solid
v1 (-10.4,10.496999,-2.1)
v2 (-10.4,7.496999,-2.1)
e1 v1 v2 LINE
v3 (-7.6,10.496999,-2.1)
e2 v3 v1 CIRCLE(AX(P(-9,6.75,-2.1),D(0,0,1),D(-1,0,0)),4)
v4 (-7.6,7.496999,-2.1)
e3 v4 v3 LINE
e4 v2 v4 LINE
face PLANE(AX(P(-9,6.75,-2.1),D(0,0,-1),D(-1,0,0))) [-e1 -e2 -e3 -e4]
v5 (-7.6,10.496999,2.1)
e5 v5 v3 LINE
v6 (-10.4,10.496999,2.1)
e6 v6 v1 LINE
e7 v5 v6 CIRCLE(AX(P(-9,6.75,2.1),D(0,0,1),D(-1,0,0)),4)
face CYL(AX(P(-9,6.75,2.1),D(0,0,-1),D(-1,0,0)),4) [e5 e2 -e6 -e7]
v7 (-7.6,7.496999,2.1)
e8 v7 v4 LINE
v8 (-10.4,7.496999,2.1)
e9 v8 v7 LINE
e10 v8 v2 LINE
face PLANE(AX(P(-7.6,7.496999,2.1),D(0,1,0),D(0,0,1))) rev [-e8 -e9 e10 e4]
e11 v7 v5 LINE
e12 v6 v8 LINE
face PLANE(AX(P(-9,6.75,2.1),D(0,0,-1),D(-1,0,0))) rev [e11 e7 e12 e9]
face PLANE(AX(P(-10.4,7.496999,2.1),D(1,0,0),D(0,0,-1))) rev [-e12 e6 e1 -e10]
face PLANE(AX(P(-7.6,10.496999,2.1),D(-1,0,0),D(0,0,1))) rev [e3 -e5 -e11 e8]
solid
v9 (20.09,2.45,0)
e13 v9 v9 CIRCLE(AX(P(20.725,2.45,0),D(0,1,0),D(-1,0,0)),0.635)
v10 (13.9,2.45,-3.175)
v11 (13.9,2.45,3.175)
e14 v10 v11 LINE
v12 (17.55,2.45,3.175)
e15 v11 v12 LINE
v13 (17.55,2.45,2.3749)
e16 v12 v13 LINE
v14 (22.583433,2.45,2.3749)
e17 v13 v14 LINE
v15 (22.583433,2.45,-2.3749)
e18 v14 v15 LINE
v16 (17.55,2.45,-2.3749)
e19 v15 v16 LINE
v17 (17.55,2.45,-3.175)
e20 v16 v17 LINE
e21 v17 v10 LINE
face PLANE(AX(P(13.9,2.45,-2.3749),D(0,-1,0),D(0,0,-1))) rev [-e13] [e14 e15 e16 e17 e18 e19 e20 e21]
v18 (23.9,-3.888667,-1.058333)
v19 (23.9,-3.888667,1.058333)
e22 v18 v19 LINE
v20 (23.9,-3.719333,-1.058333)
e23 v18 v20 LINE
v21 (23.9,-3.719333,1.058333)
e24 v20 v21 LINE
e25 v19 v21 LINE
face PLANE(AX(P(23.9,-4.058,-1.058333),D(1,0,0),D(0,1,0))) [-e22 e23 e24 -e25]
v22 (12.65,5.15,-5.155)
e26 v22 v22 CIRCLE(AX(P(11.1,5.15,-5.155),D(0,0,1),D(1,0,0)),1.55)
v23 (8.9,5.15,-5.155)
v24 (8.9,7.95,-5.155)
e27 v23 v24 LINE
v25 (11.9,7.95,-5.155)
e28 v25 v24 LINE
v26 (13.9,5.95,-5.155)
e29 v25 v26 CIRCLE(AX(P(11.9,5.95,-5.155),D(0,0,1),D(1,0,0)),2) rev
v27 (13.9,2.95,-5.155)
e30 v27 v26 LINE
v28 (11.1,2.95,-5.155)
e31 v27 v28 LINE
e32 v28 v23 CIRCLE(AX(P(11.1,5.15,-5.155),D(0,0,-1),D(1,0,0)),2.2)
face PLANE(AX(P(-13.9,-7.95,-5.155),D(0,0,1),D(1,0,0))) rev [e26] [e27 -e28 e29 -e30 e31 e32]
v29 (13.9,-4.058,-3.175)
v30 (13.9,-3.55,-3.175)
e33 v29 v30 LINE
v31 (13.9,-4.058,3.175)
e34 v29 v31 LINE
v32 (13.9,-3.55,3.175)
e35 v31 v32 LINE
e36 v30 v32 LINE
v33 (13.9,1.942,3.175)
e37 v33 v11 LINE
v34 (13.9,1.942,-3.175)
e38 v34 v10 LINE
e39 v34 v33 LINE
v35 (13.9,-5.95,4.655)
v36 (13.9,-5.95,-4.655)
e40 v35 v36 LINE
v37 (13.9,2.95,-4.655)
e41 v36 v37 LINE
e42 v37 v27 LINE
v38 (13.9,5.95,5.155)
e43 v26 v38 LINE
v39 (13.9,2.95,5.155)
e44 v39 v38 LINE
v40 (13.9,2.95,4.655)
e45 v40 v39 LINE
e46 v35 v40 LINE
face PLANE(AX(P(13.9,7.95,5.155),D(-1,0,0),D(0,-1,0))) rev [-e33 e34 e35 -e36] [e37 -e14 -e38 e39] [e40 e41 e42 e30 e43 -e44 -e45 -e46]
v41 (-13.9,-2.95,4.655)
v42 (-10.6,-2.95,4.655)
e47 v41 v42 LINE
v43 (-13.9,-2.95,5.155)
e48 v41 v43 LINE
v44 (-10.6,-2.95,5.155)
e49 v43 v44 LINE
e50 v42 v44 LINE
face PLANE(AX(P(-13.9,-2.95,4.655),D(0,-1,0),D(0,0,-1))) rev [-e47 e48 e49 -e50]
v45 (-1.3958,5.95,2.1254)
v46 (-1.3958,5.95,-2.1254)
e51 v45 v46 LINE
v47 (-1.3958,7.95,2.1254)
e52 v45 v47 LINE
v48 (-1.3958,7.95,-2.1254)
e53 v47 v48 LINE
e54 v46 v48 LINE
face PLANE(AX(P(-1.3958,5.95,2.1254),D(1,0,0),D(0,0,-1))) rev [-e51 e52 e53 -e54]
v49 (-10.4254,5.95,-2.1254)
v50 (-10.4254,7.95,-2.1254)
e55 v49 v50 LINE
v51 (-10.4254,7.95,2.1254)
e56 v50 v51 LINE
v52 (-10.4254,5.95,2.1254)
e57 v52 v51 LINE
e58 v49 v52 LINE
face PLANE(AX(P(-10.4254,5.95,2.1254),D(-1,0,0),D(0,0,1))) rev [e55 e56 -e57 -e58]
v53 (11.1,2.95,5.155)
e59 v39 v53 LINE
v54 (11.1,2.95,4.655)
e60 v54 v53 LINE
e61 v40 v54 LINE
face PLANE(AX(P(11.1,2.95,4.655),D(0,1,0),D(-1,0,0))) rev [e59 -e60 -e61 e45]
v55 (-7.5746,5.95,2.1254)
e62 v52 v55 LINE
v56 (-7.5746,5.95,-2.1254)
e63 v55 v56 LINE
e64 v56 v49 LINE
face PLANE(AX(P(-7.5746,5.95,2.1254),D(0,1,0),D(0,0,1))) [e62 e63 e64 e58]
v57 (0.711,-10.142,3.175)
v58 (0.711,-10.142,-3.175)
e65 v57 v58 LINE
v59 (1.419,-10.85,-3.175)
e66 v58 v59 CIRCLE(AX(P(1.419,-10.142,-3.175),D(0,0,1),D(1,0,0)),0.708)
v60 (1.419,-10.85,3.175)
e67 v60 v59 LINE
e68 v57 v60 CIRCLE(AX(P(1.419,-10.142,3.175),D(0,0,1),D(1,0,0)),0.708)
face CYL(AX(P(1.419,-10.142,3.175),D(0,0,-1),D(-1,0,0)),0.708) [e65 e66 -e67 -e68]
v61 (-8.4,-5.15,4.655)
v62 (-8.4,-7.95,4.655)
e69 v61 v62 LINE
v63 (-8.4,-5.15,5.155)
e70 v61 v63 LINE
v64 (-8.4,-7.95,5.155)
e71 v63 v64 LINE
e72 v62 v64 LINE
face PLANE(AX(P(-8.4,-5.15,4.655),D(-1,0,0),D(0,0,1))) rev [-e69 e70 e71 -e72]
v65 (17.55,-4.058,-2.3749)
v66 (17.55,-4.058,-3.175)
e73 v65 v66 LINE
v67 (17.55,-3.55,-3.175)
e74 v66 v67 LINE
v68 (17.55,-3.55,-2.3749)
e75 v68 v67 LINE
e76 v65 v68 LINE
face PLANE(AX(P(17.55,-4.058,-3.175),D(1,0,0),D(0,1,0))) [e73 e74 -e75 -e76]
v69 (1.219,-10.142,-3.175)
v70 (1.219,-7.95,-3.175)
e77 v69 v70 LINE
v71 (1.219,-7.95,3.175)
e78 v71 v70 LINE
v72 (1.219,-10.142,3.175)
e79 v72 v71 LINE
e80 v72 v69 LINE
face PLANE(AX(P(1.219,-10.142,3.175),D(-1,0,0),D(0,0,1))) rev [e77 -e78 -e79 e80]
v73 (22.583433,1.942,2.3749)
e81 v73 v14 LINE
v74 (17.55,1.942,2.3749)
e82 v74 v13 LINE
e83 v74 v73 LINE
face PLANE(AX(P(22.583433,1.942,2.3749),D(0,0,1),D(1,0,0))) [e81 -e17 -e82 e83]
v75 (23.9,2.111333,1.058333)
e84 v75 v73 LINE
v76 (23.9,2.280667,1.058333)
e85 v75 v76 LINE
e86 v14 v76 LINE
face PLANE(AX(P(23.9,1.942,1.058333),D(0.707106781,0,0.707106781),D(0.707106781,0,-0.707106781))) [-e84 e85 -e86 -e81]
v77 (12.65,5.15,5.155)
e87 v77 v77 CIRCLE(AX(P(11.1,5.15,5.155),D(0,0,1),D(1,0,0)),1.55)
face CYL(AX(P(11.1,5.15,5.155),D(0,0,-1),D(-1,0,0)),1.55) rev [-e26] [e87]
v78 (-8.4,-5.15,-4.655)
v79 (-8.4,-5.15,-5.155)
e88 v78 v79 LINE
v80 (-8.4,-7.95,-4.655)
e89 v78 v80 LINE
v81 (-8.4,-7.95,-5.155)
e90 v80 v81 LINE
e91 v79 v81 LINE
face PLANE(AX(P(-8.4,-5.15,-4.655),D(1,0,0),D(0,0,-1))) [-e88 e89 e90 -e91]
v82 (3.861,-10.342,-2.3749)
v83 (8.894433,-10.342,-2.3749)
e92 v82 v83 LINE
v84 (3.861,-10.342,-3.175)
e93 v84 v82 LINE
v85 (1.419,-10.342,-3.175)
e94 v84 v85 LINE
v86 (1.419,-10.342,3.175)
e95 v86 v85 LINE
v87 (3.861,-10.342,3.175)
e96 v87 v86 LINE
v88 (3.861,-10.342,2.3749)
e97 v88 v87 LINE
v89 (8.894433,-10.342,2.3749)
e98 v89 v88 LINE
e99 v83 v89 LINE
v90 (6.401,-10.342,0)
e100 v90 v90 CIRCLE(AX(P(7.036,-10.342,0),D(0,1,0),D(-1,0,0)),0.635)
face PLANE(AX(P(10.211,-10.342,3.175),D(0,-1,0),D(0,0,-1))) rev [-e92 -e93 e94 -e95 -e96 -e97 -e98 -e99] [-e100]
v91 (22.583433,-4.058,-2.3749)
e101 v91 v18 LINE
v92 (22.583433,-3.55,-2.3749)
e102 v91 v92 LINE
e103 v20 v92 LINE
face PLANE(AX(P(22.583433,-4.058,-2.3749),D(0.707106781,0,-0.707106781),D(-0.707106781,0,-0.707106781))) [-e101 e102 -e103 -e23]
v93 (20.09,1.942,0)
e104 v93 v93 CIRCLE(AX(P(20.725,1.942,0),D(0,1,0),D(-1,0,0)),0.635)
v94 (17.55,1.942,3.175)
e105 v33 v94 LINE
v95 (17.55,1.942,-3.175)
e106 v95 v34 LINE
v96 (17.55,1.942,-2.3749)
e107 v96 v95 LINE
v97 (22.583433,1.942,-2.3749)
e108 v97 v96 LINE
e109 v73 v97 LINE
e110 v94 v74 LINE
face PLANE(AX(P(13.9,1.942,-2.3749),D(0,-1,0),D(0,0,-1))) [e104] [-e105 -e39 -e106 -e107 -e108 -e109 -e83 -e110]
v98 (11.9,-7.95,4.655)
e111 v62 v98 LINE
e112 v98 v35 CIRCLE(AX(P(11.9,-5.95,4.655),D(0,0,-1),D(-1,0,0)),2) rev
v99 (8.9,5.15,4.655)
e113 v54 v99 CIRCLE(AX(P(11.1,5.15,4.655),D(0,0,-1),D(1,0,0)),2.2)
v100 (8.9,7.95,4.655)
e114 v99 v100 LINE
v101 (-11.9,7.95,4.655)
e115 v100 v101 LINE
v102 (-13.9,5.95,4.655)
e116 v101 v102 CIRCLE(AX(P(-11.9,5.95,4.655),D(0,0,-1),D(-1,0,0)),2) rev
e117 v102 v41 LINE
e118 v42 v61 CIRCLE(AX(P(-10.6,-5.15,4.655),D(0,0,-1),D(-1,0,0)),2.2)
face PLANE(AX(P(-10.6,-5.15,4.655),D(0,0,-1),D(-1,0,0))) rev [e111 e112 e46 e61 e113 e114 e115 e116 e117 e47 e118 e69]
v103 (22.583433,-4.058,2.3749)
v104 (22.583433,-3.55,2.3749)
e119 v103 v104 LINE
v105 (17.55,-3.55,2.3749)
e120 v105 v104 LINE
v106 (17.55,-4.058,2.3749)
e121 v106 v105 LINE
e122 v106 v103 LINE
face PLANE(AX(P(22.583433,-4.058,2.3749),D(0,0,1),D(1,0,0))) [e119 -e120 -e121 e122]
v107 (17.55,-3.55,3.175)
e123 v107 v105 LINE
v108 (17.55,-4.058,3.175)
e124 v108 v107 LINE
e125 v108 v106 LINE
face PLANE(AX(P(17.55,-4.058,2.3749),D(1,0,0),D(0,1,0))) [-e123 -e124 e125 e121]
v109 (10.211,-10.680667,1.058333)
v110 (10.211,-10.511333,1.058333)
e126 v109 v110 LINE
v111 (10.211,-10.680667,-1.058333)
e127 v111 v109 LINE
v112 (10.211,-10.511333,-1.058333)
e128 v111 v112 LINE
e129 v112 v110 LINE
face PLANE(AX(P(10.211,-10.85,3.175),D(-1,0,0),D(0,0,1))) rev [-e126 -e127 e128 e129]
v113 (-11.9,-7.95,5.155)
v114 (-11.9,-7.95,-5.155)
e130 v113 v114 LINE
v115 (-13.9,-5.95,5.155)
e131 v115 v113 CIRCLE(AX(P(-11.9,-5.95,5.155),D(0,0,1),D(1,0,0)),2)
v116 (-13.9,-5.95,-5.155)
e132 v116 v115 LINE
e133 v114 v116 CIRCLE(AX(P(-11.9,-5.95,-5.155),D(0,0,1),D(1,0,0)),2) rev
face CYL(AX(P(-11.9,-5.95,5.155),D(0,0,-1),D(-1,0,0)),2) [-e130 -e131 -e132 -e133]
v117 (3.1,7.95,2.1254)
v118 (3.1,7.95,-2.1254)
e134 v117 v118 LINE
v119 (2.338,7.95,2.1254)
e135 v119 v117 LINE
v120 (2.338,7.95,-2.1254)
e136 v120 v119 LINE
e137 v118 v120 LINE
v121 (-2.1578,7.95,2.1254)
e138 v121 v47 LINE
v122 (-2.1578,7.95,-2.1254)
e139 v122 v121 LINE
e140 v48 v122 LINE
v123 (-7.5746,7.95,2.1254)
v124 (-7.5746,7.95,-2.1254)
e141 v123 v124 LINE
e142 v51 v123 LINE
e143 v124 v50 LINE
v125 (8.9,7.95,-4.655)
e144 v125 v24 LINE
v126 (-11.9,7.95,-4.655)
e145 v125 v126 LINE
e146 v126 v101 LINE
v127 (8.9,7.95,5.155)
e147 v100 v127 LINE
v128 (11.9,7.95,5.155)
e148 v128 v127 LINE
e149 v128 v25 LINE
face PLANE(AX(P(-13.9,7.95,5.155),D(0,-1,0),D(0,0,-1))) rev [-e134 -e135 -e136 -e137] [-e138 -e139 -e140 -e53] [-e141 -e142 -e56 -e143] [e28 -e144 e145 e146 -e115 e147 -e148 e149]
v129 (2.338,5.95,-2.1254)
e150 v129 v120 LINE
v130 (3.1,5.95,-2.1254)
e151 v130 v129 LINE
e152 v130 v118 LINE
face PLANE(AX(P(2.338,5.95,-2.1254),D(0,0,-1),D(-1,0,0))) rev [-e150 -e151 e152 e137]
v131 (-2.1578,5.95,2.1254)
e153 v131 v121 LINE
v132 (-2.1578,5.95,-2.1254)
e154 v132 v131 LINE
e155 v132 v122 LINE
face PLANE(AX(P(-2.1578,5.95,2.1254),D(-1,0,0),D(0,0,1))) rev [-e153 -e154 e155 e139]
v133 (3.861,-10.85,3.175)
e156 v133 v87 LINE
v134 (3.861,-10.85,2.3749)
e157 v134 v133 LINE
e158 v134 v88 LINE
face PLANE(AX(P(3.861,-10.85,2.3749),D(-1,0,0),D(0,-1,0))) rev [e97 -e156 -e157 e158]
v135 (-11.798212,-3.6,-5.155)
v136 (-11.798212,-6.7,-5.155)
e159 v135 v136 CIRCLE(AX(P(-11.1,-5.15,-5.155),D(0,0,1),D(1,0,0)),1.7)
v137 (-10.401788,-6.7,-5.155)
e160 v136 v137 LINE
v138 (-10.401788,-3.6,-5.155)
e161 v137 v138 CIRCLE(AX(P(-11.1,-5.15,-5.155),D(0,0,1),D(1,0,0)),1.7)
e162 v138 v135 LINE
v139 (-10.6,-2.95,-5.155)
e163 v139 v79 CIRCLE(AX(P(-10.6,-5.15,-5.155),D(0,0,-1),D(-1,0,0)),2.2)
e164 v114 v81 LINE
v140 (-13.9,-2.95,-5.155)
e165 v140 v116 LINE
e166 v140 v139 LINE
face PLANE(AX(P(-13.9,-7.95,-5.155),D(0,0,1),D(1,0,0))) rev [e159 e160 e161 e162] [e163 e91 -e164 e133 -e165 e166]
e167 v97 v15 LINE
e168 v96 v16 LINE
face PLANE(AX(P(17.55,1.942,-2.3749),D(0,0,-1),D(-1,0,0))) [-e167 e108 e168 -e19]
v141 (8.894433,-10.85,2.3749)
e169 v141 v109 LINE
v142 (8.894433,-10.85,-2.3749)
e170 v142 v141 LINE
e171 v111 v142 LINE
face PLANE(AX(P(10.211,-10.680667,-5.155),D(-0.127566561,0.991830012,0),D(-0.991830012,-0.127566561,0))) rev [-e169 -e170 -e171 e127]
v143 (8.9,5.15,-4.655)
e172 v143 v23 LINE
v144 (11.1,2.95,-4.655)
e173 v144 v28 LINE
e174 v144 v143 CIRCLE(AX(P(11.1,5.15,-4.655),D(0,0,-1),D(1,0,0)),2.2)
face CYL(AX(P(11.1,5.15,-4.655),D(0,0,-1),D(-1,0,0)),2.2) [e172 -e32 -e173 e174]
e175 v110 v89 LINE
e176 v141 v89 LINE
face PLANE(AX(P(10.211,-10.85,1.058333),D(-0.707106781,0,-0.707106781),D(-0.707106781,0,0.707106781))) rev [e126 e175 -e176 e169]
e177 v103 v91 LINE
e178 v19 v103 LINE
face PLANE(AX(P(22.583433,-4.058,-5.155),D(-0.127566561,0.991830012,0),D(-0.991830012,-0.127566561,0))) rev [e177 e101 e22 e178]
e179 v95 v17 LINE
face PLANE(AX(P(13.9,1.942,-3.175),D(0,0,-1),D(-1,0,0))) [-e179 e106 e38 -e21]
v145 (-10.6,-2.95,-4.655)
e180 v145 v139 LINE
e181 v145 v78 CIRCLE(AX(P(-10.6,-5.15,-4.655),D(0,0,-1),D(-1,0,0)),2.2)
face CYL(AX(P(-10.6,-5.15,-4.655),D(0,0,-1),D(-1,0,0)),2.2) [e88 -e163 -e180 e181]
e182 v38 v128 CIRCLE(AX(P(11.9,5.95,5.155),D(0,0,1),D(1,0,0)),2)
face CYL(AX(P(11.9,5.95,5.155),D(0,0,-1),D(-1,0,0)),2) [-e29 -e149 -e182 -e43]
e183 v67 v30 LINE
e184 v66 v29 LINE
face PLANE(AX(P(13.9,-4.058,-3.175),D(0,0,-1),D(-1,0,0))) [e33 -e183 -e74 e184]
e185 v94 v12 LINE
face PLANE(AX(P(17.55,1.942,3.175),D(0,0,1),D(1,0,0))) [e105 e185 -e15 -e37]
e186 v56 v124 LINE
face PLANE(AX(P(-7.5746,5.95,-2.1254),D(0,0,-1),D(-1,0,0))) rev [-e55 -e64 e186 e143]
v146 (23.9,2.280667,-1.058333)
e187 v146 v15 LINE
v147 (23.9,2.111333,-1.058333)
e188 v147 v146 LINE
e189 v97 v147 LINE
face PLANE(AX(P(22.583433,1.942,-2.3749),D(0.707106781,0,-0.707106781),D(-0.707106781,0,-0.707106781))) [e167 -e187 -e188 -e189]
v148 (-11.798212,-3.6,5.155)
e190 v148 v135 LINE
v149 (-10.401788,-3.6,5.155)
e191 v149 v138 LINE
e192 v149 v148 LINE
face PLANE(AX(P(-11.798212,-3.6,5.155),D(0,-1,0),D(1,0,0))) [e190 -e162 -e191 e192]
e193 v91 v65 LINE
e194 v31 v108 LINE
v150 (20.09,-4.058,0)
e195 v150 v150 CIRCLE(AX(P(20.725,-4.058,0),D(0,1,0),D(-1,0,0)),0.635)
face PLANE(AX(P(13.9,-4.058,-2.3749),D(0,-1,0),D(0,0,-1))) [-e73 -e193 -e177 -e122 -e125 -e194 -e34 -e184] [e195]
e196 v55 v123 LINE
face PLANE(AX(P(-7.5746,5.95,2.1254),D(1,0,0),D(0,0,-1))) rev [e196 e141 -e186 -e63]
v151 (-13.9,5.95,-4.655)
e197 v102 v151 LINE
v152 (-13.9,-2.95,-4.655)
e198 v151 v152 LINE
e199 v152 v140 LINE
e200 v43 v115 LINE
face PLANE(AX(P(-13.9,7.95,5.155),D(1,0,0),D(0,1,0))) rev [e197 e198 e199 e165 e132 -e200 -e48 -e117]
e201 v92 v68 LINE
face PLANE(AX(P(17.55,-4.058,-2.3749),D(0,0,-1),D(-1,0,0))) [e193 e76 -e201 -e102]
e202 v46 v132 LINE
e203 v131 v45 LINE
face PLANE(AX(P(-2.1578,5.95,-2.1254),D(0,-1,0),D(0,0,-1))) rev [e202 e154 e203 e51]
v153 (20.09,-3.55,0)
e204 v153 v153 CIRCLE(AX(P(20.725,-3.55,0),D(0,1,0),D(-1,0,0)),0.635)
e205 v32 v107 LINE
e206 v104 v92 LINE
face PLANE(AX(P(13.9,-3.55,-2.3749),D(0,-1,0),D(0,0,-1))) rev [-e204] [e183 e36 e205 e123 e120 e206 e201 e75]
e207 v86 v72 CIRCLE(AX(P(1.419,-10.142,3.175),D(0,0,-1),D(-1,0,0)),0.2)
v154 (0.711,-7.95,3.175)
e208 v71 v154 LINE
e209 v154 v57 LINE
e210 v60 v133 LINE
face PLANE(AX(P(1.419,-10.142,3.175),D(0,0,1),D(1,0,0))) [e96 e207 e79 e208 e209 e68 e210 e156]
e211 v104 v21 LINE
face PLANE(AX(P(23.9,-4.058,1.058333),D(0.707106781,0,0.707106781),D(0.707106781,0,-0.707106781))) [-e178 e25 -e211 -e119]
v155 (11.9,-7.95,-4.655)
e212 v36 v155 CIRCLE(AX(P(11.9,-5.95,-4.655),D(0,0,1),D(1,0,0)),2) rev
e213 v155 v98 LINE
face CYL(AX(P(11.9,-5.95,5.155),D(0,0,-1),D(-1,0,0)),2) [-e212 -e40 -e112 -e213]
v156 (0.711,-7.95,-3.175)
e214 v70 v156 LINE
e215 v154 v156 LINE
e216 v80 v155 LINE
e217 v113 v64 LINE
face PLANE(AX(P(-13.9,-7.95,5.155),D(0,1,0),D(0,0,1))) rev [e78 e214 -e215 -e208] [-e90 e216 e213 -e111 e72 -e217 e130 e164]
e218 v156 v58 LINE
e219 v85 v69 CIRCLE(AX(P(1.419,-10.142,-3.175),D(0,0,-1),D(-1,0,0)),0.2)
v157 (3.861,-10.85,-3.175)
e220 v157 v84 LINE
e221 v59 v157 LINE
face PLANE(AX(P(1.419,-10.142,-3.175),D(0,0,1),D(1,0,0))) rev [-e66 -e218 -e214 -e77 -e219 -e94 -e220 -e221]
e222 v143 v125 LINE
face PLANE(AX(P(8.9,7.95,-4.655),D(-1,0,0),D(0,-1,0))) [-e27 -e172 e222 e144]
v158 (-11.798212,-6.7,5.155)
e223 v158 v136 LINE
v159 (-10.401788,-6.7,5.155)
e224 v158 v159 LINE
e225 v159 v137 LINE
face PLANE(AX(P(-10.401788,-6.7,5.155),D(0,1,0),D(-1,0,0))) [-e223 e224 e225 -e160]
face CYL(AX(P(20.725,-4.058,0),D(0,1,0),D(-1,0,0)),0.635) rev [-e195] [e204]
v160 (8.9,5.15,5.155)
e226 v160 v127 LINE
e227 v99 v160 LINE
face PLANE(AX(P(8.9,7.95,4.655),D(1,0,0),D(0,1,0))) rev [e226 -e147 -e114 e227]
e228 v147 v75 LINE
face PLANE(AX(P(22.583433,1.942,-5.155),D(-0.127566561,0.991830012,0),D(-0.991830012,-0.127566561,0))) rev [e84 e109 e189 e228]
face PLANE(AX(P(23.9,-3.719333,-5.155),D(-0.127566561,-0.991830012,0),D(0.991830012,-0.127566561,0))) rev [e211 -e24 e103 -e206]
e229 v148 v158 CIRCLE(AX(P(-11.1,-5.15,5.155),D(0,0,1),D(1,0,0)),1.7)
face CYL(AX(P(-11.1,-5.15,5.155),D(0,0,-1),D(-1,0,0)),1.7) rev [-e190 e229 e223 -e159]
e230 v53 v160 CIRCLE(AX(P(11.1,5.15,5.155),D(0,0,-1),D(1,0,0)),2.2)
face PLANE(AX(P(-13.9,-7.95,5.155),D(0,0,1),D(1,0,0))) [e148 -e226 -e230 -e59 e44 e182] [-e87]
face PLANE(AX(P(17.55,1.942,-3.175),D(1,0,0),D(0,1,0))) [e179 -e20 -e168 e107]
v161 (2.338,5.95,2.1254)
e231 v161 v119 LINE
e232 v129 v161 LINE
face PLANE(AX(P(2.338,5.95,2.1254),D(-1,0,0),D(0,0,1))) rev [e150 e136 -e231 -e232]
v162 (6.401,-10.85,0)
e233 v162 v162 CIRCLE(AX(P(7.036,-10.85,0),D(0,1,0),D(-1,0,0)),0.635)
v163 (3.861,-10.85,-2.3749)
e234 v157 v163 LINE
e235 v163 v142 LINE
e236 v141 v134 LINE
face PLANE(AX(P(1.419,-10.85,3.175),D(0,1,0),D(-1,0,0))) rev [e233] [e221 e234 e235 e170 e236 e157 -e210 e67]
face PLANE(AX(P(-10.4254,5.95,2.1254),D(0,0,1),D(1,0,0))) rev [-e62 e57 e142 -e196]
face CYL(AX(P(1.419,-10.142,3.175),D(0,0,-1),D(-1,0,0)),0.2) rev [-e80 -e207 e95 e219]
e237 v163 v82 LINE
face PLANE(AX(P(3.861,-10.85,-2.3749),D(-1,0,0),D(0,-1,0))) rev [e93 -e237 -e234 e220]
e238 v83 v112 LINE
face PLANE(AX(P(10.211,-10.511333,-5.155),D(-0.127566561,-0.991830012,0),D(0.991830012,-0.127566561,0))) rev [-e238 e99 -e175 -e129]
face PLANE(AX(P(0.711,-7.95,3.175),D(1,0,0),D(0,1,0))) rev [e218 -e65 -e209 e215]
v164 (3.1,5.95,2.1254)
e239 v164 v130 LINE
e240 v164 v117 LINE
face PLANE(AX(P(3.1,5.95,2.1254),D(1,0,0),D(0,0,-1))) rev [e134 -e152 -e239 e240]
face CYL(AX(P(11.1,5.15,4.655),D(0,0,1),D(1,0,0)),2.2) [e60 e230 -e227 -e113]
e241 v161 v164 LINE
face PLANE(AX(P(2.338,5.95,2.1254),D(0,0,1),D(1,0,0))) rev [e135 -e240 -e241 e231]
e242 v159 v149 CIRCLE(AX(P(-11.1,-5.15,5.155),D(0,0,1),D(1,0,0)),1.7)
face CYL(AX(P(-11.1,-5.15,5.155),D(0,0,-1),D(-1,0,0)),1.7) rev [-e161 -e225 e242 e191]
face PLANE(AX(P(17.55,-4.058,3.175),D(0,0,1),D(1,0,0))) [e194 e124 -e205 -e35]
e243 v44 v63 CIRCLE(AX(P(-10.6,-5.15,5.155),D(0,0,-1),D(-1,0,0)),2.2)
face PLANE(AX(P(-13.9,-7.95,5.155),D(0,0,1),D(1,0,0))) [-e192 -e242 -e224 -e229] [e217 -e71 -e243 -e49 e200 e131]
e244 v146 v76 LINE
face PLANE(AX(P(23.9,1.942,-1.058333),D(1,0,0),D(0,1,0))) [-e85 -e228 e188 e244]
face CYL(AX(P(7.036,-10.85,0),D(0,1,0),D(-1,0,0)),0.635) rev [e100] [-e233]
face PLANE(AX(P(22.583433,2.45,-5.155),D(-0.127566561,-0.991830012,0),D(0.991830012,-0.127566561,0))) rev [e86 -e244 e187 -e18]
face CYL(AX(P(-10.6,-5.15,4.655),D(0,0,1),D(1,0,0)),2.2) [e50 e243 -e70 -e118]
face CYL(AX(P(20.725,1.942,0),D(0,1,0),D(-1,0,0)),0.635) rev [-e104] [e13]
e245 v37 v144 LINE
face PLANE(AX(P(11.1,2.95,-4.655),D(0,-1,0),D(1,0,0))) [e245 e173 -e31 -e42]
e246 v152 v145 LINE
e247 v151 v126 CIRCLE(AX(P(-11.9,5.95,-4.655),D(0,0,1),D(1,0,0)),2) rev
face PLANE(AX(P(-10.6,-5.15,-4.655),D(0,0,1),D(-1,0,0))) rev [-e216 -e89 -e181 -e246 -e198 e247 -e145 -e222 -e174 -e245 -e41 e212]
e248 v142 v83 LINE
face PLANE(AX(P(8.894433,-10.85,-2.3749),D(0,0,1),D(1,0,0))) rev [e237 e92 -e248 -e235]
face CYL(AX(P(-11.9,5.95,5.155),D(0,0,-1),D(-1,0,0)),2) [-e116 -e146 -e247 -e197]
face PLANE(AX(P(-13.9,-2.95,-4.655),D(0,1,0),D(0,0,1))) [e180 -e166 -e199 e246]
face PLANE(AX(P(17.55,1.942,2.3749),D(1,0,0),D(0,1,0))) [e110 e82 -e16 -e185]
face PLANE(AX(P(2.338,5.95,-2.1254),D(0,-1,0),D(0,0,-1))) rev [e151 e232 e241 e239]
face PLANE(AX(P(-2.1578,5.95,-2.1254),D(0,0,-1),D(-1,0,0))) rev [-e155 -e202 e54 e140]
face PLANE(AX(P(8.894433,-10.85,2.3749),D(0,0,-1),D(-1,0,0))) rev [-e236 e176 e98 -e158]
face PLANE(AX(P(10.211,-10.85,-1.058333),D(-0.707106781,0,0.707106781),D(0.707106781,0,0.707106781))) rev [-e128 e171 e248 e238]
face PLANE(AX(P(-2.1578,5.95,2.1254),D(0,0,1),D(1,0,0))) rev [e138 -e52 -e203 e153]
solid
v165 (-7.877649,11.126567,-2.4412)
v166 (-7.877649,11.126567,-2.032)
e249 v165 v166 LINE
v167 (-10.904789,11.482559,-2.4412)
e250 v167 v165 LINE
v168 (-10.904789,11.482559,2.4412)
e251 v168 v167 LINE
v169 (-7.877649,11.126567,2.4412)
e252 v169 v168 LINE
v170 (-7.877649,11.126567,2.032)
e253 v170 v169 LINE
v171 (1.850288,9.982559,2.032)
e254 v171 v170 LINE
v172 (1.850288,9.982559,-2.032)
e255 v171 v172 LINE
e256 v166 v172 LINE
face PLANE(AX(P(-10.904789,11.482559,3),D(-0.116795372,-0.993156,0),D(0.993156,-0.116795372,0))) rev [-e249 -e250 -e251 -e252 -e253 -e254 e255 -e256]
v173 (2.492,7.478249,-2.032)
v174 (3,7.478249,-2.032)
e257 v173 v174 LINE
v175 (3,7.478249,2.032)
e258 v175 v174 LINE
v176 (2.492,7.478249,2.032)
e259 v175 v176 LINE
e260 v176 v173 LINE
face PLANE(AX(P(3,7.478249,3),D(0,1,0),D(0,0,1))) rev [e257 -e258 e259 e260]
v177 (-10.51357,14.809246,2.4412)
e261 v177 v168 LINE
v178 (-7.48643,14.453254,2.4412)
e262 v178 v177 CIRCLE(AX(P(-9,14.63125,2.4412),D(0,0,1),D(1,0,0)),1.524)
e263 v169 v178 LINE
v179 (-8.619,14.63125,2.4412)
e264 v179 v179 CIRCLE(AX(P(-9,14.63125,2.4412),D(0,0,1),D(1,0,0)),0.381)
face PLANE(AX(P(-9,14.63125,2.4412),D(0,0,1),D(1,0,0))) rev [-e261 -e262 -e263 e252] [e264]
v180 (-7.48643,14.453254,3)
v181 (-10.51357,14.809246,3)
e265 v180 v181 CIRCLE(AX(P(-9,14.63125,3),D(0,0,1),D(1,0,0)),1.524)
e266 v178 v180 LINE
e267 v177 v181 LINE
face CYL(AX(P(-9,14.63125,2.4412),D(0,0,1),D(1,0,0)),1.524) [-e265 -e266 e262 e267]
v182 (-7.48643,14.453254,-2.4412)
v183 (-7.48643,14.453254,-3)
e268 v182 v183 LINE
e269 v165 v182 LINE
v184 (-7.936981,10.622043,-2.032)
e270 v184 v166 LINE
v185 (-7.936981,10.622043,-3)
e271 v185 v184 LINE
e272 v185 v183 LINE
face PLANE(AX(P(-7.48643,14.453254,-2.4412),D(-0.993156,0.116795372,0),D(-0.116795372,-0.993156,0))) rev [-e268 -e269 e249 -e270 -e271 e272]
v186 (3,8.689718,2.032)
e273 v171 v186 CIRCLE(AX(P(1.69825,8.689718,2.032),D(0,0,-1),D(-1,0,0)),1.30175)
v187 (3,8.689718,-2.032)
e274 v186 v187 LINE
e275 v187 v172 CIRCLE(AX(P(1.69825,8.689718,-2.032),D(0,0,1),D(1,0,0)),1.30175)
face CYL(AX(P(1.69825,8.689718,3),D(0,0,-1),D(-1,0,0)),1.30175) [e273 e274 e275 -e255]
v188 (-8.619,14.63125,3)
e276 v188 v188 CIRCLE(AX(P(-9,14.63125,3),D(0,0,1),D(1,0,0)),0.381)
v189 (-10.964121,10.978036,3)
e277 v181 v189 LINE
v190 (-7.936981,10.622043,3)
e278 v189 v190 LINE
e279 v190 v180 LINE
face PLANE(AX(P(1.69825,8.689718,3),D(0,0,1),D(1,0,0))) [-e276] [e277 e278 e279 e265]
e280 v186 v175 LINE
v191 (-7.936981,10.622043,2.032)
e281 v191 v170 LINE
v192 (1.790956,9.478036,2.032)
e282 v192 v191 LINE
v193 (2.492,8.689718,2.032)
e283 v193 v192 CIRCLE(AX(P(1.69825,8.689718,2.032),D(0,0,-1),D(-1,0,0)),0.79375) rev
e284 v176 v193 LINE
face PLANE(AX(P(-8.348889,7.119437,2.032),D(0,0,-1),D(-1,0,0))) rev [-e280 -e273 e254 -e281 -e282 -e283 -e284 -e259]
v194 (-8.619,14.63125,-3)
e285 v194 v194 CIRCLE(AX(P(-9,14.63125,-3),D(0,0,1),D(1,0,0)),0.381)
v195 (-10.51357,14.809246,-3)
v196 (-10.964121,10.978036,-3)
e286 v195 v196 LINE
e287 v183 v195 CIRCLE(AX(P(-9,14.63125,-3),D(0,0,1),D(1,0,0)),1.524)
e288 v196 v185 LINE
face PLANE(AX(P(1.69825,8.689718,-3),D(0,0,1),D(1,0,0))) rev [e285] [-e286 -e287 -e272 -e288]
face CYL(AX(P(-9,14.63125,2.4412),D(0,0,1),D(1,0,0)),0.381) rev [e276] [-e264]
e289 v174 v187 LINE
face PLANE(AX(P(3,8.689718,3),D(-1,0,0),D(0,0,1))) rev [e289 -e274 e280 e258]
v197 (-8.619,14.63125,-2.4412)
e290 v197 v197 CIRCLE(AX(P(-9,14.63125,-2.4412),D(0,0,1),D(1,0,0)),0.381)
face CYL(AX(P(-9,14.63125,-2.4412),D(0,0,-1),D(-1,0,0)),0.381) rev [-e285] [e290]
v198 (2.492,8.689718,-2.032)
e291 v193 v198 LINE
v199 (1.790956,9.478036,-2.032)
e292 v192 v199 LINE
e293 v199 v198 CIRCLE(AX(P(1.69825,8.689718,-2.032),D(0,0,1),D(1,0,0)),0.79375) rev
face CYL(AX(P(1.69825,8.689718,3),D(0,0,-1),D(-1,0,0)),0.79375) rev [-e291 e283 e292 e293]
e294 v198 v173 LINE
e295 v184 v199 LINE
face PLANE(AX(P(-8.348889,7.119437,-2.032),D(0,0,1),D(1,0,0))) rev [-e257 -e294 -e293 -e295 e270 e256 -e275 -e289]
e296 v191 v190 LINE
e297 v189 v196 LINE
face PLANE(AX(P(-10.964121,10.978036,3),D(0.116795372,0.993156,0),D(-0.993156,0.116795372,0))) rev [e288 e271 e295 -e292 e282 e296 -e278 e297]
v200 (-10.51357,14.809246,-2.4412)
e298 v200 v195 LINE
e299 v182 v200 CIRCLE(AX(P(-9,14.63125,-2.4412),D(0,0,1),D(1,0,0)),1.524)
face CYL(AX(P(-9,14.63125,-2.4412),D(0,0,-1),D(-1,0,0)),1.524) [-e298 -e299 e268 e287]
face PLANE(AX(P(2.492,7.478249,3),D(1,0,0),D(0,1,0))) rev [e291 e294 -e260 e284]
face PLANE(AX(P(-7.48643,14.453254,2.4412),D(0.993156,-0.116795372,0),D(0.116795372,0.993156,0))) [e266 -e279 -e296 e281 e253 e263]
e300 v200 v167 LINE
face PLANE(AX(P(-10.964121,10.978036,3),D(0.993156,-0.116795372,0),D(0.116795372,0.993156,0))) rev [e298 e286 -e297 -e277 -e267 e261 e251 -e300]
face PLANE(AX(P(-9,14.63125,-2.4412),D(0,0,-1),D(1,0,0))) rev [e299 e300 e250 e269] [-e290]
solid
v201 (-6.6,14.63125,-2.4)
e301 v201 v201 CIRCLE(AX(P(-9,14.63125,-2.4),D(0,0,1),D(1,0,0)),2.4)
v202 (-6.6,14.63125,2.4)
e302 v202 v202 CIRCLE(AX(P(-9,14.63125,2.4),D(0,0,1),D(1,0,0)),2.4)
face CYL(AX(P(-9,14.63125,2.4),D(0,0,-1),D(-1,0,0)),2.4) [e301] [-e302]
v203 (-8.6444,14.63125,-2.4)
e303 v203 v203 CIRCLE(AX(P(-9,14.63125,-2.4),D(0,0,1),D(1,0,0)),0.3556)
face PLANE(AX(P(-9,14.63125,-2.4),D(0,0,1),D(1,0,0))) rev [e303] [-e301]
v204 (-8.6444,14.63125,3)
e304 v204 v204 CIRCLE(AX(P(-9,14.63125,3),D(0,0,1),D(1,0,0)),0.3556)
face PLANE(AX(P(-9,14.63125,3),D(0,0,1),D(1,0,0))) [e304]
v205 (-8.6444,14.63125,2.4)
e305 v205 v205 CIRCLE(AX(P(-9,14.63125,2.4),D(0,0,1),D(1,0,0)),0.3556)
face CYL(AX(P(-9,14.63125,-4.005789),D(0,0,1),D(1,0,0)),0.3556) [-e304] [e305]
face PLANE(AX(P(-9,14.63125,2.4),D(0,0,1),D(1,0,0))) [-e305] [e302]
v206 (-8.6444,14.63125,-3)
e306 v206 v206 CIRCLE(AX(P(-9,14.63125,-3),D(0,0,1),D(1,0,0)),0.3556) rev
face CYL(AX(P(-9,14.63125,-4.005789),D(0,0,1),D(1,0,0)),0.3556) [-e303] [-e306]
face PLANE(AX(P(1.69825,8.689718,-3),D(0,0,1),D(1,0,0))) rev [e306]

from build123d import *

# Parameters (mm, degrees)
SKETCH1_W               = 27.8
SKETCH1_H               = 15.9
SKETCH1_R               = 1.55
EXTRUDE1_DEPTH          = 5.155
FILLET1_R               = 2
EXTRUDE2_DEPTH          = 2.1
SKETCH3_W               = 2.8508
SKETCH3_H               = 4.2508
SKETCH3_W_2             = 0.762
CUT_EXTRUDE1_DEPTH      = 2
CUT_EXTRUDE2_DEPTH      = 0.5
EXTRUDE3_DEPTH          = 3.175
SKETCH6_R               = 0.635
CUT_EXTRUDE3_DEPTH      = 26.780932664
EXTRUDE4_START          = -5.5
SKETCH8_R               = 0.635
EXTRUDE4_DEPTH          = 0.508
LPATTERN1_COUNT         = 2
LPATTERN1_PITCH         = 6
CUT_EXTRUDE4_DEPTH      = 27.748953718
CUT_EXTRUDE4_DEPTH_BACK = 27.748953718
ROLLER_START            = -2.032
ROLLER_DEPTH            = 4.064
ROLLER_START_2          = -3
ROLLER_2_OUTLINE_R      = 0.381
ROLLER_2_DEPTH          = 0.5588
ROLLER_START_3          = 2.4412
ROLLER_3_OUTLINE_R      = 0.381
ROLLER_3_DEPTH          = 0.5588
ROLLER_START_4          = -2.4412
ROLLER_4_DEPTH          = 4.8824
ROLLER_START_5          = -2.4
ROLLER_5_OUTLINE_R      = 2.4
ROLLER_5_DEPTH          = 4.8
ROLLER_6_OUTLINE_R      = 0.3556
ROLLER_6_DEPTH          = 6


# Read off the part's stored shape, not the designer's step: Roller
with BuildPart() as part:
    # Sketch1 → Extrude1 (new, symmetric)
    with BuildSketch(Plane.XY):
        Rectangle(SKETCH1_W, SKETCH1_H)
        with Locations((11.1, 5.15)):
            Circle(SKETCH1_R, mode=Mode.SUBTRACT)
        with BuildLine():
            Line((-11.798212002, -3.6), (-10.401787998, -3.6))
            ThreePointArc((-10.401787998, -3.6), (-9.4, -5.15), (-10.401787998, -6.7))
            Line((-10.401787998, -6.7), (-11.798212002, -6.7))
            ThreePointArc((-11.798212002, -6.7), (-12.8, -5.15), (-11.798212002, -3.6))
        make_face(mode=Mode.SUBTRACT)
    extrude(amount=EXTRUDE1_DEPTH, both=True)

    # Fillet1
    fillet1_edges = [part.edges().sort_by_distance(p)[0] for p in [
        (-13.9, 7.95, 0),
        (13.9, 7.95, 0),
        (13.9, -7.95, 0),
        (-13.9, -7.95, 0),
    ]]
    fillet(fillet1_edges, radius=FILLET1_R)

    # Sketch3 → Cut-Extrude1 (cut)
    with BuildSketch(Plane(origin=(0, 7.95, 0), x_dir=(-1, 0, 0), z_dir=(0, 1, 0))):
        with Locations((9, 0)):
            Rectangle(SKETCH3_W, SKETCH3_H)
        with Locations((1.7768, 0)):
            Rectangle(SKETCH3_W_2, SKETCH3_H)
        with Locations((-2.719, 0)):
            Rectangle(SKETCH3_W_2, SKETCH3_H)
    extrude(amount=-CUT_EXTRUDE1_DEPTH, mode=Mode.SUBTRACT)

    # Sketch4 → Cut-Extrude2 (cut)
    with BuildSketch(Plane.XY.offset(5.155)):
        with BuildLine():
            Line((-8.4, -7.95), (13.9, -7.95))
            Line((13.9, -7.95), (13.9, 2.95))
            Line((13.9, 2.95), (11.1, 2.95))
            ThreePointArc((11.1, 2.95), (9.544365081, 3.594365081), (8.9, 5.15))
            Line((8.9, 5.15), (8.9, 7.95))
            Line((8.9, 7.95), (-13.9, 7.95))
            Line((-13.9, 7.95), (-13.9, -2.95))
            Line((-13.9, -2.95), (-10.6, -2.95))
            ThreePointArc((-10.6, -2.95), (-9.044365081, -3.594365081), (-8.4, -5.15))
            Line((-8.4, -5.15), (-8.4, -7.95))
        make_face()
    cut_extrude2 = extrude(amount=-CUT_EXTRUDE2_DEPTH, mode=Mode.SUBTRACT)

    # Mirror1: Cut-Extrude2 across plane
    add(cut_extrude2.mirror(Plane.XY), mode=Mode.SUBTRACT)

    # Sketch5 → Extrude3 (add, symmetric)
    with BuildSketch(Plane.XY):
        with BuildLine():
            Line((0.711, -7.95), (0.711, -10.142))
            ThreePointArc((0.711, -10.142), (0.918368399, -10.642631601), (1.419, -10.85))
            Line((1.419, -10.85), (10.211, -10.85))
            Line((10.211, -10.85), (10.211, -10.342))
            Line((10.211, -10.342), (1.419, -10.342))
            ThreePointArc((1.419, -10.342), (1.277578644, -10.283421356), (1.219, -10.142))
            Line((1.219, -10.142), (1.219, -7.95))
            Line((1.219, -7.95), (0.711, -7.95))
        make_face()
    extrude(amount=EXTRUDE3_DEPTH, both=True)

    # Sketch6 → Cut-Extrude3 (cut, through all)
    with BuildSketch(Plane(origin=(0, -10.342, 0), x_dir=(-1, 0, 0), z_dir=(0, 1, 0))):
        with Locations((-7.036, 0)):
            Circle(SKETCH6_R)
        Polygon((-10.211, 1.058333333), (-8.894433333, 2.3749), (-3.861, 2.3749), (-3.861, 3.175), (-10.211, 3.175), align=None)
        Polygon((-10.211, -3.175), (-10.211, -1.058333333), (-8.894433333, -2.3749), (-3.861, -2.3749), (-3.861, -3.175), align=None)
    extrude(amount=-CUT_EXTRUDE3_DEPTH, mode=Mode.SUBTRACT)

    # Sketch8 → Extrude4 (add)
    with BuildSketch(Plane(origin=(0, 7.95, 0), x_dir=(-1, 0, 0), z_dir=(0, 1, 0)).offset(EXTRUDE4_START)):
        Polygon((-13.9, -3.175), (-17.55, -3.175), (-17.55, -2.3749), (-22.583433333, -2.3749), (-23.9, -1.058333333), (-23.9, 1.058333333), (-22.583433333, 2.3749), (-17.55, 2.3749), (-17.55, 3.175), (-13.9, 3.175), align=None)
        with Locations((-20.725, 0)):
            Circle(SKETCH8_R, mode=Mode.SUBTRACT)
    extrude4 = extrude(amount=-EXTRUDE4_DEPTH)

    # LPattern1: Extrude4 ×2
    with Locations(*[(0, -i * LPATTERN1_PITCH, 0) for i in range(1, LPATTERN1_COUNT)]):
        add(extrude4)

    # Sketch7 → Cut-Extrude4 (cut, two sides: drawn at the far end of the back side and taken through both)
    with BuildSketch(Plane.XY.offset(-CUT_EXTRUDE4_DEPTH_BACK)):
        Polygon((8.894433333, -10.342), (10.211, -10.342), (10.211, -10.511333333), align=None)
        Polygon((8.894433333, -10.85), (10.211, -10.85), (10.211, -10.680666667), align=None)
        Polygon((23.9, -3.719333333), (22.583433333, -3.55), (23.9, -3.55), align=None)
        Polygon((23.9, -3.888666667), (23.9, -4.058), (22.583433333, -4.058), align=None)
        Polygon((22.583433333, 2.45), (23.9, 2.280666667), (23.9, 2.45), align=None)
        Polygon((23.9, 2.111333333), (23.9, 1.942), (22.583433333, 1.942), align=None)
    extrude(amount=CUT_EXTRUDE4_DEPTH + CUT_EXTRUDE4_DEPTH_BACK, mode=Mode.SUBTRACT)


with BuildPart() as body_2:
    # Sketch2 → Extrude2 (new, symmetric)
    with BuildSketch(Plane.XY):
        with BuildLine():
            Line((-10.4, 7.496998799), (-10.4, 10.496998799))
            ThreePointArc((-10.4, 10.496998799), (-9, 10.75), (-7.6, 10.496998799))
            Line((-7.6, 10.496998799), (-7.6, 7.496998799))
            Line((-7.6, 7.496998799), (-10.4, 7.496998799))
        make_face()
    extrude(amount=EXTRUDE2_DEPTH, both=True)


with BuildPart() as body_3:
    # Roller outline → Roller (new body)
    with BuildSketch(Plane.XY.offset(ROLLER_START)):
        with BuildLine():
            Line((-10.904788918, 11.48255895), (-10.964120967, 10.978035702))
            Line((-10.964120967, 10.978035702), (1.790956327, 9.478035702))
            ThreePointArc((1.790956327, 9.478035702), (2.29138772, 9.217190124), (2.492, 8.689718127))
            Line((2.492, 8.689718127), (2.492, 7.478248799))
            Line((2.492, 7.478248799), (3, 7.478248799))
            Line((3, 7.478248799), (3, 8.689718127))
            ThreePointArc((3, 8.689718127), (2.67099586, 9.554772202), (1.850288376, 9.98255895))
            Line((1.850288376, 9.98255895), (-10.904788918, 11.48255895))
        make_face()
    extrude(amount=ROLLER_DEPTH)

    # Roller 2 outline → Roller 2 (add)
    with BuildSketch(Plane.XY.offset(ROLLER_START_2)):
        with BuildLine():
            Line((-10.513569745, 14.809246147), (-10.964120967, 10.978035702))
            Line((-10.964120967, 10.978035702), (-7.936981478, 10.622043407))
            Line((-7.936981478, 10.622043407), (-7.486430255, 14.453253853))
            ThreePointArc((-7.486430255, 14.453253853), (-8.822003853, 16.144819745), (-10.513569745, 14.809246147))
        make_face()
        with Locations((-9, 14.63125)):
            Circle(ROLLER_2_OUTLINE_R, mode=Mode.SUBTRACT)
    extrude(amount=ROLLER_2_DEPTH)

    # Roller 3 outline → Roller 3 (add)
    with BuildSketch(Plane.XY.offset(ROLLER_START_3)):
        with BuildLine():
            Line((-10.513569745, 14.809246147), (-10.964120967, 10.978035702))
            Line((-10.964120967, 10.978035702), (-7.936981478, 10.622043407))
            Line((-7.936981478, 10.622043407), (-7.486430255, 14.453253853))
            ThreePointArc((-7.486430255, 14.453253853), (-8.822003853, 16.144819745), (-10.513569745, 14.809246147))
        make_face()
        with Locations((-9, 14.63125)):
            Circle(ROLLER_3_OUTLINE_R, mode=Mode.SUBTRACT)
    extrude(amount=ROLLER_3_DEPTH)

    # Roller 4 outline → Roller 4 (add)
    with BuildSketch(Plane.XY.offset(ROLLER_START_4)):
        Polygon((-7.877649429, 11.126566655), (-10.904788918, 11.48255895), (-10.964120967, 10.978035702), (-7.936981478, 10.622043407), align=None)
    extrude(amount=ROLLER_4_DEPTH)


with BuildPart() as body_4:
    # Roller 5 outline → Roller 5 (new body)
    with BuildSketch(Plane.XY.offset(ROLLER_START_5)):
        with Locations((-9, 14.63125)):
            Circle(ROLLER_5_OUTLINE_R)
    extrude(amount=ROLLER_5_DEPTH)

    # Roller 6 outline → Roller 6 (add)
    with BuildSketch(Plane.XY.offset(ROLLER_START_2)):
        with Locations((-9, 14.63125)):
            Circle(ROLLER_6_OUTLINE_R)
    extrude(amount=ROLLER_6_DEPTH)


solid = Compound([part.part, body_2.part, body_3.part, body_4.part])
